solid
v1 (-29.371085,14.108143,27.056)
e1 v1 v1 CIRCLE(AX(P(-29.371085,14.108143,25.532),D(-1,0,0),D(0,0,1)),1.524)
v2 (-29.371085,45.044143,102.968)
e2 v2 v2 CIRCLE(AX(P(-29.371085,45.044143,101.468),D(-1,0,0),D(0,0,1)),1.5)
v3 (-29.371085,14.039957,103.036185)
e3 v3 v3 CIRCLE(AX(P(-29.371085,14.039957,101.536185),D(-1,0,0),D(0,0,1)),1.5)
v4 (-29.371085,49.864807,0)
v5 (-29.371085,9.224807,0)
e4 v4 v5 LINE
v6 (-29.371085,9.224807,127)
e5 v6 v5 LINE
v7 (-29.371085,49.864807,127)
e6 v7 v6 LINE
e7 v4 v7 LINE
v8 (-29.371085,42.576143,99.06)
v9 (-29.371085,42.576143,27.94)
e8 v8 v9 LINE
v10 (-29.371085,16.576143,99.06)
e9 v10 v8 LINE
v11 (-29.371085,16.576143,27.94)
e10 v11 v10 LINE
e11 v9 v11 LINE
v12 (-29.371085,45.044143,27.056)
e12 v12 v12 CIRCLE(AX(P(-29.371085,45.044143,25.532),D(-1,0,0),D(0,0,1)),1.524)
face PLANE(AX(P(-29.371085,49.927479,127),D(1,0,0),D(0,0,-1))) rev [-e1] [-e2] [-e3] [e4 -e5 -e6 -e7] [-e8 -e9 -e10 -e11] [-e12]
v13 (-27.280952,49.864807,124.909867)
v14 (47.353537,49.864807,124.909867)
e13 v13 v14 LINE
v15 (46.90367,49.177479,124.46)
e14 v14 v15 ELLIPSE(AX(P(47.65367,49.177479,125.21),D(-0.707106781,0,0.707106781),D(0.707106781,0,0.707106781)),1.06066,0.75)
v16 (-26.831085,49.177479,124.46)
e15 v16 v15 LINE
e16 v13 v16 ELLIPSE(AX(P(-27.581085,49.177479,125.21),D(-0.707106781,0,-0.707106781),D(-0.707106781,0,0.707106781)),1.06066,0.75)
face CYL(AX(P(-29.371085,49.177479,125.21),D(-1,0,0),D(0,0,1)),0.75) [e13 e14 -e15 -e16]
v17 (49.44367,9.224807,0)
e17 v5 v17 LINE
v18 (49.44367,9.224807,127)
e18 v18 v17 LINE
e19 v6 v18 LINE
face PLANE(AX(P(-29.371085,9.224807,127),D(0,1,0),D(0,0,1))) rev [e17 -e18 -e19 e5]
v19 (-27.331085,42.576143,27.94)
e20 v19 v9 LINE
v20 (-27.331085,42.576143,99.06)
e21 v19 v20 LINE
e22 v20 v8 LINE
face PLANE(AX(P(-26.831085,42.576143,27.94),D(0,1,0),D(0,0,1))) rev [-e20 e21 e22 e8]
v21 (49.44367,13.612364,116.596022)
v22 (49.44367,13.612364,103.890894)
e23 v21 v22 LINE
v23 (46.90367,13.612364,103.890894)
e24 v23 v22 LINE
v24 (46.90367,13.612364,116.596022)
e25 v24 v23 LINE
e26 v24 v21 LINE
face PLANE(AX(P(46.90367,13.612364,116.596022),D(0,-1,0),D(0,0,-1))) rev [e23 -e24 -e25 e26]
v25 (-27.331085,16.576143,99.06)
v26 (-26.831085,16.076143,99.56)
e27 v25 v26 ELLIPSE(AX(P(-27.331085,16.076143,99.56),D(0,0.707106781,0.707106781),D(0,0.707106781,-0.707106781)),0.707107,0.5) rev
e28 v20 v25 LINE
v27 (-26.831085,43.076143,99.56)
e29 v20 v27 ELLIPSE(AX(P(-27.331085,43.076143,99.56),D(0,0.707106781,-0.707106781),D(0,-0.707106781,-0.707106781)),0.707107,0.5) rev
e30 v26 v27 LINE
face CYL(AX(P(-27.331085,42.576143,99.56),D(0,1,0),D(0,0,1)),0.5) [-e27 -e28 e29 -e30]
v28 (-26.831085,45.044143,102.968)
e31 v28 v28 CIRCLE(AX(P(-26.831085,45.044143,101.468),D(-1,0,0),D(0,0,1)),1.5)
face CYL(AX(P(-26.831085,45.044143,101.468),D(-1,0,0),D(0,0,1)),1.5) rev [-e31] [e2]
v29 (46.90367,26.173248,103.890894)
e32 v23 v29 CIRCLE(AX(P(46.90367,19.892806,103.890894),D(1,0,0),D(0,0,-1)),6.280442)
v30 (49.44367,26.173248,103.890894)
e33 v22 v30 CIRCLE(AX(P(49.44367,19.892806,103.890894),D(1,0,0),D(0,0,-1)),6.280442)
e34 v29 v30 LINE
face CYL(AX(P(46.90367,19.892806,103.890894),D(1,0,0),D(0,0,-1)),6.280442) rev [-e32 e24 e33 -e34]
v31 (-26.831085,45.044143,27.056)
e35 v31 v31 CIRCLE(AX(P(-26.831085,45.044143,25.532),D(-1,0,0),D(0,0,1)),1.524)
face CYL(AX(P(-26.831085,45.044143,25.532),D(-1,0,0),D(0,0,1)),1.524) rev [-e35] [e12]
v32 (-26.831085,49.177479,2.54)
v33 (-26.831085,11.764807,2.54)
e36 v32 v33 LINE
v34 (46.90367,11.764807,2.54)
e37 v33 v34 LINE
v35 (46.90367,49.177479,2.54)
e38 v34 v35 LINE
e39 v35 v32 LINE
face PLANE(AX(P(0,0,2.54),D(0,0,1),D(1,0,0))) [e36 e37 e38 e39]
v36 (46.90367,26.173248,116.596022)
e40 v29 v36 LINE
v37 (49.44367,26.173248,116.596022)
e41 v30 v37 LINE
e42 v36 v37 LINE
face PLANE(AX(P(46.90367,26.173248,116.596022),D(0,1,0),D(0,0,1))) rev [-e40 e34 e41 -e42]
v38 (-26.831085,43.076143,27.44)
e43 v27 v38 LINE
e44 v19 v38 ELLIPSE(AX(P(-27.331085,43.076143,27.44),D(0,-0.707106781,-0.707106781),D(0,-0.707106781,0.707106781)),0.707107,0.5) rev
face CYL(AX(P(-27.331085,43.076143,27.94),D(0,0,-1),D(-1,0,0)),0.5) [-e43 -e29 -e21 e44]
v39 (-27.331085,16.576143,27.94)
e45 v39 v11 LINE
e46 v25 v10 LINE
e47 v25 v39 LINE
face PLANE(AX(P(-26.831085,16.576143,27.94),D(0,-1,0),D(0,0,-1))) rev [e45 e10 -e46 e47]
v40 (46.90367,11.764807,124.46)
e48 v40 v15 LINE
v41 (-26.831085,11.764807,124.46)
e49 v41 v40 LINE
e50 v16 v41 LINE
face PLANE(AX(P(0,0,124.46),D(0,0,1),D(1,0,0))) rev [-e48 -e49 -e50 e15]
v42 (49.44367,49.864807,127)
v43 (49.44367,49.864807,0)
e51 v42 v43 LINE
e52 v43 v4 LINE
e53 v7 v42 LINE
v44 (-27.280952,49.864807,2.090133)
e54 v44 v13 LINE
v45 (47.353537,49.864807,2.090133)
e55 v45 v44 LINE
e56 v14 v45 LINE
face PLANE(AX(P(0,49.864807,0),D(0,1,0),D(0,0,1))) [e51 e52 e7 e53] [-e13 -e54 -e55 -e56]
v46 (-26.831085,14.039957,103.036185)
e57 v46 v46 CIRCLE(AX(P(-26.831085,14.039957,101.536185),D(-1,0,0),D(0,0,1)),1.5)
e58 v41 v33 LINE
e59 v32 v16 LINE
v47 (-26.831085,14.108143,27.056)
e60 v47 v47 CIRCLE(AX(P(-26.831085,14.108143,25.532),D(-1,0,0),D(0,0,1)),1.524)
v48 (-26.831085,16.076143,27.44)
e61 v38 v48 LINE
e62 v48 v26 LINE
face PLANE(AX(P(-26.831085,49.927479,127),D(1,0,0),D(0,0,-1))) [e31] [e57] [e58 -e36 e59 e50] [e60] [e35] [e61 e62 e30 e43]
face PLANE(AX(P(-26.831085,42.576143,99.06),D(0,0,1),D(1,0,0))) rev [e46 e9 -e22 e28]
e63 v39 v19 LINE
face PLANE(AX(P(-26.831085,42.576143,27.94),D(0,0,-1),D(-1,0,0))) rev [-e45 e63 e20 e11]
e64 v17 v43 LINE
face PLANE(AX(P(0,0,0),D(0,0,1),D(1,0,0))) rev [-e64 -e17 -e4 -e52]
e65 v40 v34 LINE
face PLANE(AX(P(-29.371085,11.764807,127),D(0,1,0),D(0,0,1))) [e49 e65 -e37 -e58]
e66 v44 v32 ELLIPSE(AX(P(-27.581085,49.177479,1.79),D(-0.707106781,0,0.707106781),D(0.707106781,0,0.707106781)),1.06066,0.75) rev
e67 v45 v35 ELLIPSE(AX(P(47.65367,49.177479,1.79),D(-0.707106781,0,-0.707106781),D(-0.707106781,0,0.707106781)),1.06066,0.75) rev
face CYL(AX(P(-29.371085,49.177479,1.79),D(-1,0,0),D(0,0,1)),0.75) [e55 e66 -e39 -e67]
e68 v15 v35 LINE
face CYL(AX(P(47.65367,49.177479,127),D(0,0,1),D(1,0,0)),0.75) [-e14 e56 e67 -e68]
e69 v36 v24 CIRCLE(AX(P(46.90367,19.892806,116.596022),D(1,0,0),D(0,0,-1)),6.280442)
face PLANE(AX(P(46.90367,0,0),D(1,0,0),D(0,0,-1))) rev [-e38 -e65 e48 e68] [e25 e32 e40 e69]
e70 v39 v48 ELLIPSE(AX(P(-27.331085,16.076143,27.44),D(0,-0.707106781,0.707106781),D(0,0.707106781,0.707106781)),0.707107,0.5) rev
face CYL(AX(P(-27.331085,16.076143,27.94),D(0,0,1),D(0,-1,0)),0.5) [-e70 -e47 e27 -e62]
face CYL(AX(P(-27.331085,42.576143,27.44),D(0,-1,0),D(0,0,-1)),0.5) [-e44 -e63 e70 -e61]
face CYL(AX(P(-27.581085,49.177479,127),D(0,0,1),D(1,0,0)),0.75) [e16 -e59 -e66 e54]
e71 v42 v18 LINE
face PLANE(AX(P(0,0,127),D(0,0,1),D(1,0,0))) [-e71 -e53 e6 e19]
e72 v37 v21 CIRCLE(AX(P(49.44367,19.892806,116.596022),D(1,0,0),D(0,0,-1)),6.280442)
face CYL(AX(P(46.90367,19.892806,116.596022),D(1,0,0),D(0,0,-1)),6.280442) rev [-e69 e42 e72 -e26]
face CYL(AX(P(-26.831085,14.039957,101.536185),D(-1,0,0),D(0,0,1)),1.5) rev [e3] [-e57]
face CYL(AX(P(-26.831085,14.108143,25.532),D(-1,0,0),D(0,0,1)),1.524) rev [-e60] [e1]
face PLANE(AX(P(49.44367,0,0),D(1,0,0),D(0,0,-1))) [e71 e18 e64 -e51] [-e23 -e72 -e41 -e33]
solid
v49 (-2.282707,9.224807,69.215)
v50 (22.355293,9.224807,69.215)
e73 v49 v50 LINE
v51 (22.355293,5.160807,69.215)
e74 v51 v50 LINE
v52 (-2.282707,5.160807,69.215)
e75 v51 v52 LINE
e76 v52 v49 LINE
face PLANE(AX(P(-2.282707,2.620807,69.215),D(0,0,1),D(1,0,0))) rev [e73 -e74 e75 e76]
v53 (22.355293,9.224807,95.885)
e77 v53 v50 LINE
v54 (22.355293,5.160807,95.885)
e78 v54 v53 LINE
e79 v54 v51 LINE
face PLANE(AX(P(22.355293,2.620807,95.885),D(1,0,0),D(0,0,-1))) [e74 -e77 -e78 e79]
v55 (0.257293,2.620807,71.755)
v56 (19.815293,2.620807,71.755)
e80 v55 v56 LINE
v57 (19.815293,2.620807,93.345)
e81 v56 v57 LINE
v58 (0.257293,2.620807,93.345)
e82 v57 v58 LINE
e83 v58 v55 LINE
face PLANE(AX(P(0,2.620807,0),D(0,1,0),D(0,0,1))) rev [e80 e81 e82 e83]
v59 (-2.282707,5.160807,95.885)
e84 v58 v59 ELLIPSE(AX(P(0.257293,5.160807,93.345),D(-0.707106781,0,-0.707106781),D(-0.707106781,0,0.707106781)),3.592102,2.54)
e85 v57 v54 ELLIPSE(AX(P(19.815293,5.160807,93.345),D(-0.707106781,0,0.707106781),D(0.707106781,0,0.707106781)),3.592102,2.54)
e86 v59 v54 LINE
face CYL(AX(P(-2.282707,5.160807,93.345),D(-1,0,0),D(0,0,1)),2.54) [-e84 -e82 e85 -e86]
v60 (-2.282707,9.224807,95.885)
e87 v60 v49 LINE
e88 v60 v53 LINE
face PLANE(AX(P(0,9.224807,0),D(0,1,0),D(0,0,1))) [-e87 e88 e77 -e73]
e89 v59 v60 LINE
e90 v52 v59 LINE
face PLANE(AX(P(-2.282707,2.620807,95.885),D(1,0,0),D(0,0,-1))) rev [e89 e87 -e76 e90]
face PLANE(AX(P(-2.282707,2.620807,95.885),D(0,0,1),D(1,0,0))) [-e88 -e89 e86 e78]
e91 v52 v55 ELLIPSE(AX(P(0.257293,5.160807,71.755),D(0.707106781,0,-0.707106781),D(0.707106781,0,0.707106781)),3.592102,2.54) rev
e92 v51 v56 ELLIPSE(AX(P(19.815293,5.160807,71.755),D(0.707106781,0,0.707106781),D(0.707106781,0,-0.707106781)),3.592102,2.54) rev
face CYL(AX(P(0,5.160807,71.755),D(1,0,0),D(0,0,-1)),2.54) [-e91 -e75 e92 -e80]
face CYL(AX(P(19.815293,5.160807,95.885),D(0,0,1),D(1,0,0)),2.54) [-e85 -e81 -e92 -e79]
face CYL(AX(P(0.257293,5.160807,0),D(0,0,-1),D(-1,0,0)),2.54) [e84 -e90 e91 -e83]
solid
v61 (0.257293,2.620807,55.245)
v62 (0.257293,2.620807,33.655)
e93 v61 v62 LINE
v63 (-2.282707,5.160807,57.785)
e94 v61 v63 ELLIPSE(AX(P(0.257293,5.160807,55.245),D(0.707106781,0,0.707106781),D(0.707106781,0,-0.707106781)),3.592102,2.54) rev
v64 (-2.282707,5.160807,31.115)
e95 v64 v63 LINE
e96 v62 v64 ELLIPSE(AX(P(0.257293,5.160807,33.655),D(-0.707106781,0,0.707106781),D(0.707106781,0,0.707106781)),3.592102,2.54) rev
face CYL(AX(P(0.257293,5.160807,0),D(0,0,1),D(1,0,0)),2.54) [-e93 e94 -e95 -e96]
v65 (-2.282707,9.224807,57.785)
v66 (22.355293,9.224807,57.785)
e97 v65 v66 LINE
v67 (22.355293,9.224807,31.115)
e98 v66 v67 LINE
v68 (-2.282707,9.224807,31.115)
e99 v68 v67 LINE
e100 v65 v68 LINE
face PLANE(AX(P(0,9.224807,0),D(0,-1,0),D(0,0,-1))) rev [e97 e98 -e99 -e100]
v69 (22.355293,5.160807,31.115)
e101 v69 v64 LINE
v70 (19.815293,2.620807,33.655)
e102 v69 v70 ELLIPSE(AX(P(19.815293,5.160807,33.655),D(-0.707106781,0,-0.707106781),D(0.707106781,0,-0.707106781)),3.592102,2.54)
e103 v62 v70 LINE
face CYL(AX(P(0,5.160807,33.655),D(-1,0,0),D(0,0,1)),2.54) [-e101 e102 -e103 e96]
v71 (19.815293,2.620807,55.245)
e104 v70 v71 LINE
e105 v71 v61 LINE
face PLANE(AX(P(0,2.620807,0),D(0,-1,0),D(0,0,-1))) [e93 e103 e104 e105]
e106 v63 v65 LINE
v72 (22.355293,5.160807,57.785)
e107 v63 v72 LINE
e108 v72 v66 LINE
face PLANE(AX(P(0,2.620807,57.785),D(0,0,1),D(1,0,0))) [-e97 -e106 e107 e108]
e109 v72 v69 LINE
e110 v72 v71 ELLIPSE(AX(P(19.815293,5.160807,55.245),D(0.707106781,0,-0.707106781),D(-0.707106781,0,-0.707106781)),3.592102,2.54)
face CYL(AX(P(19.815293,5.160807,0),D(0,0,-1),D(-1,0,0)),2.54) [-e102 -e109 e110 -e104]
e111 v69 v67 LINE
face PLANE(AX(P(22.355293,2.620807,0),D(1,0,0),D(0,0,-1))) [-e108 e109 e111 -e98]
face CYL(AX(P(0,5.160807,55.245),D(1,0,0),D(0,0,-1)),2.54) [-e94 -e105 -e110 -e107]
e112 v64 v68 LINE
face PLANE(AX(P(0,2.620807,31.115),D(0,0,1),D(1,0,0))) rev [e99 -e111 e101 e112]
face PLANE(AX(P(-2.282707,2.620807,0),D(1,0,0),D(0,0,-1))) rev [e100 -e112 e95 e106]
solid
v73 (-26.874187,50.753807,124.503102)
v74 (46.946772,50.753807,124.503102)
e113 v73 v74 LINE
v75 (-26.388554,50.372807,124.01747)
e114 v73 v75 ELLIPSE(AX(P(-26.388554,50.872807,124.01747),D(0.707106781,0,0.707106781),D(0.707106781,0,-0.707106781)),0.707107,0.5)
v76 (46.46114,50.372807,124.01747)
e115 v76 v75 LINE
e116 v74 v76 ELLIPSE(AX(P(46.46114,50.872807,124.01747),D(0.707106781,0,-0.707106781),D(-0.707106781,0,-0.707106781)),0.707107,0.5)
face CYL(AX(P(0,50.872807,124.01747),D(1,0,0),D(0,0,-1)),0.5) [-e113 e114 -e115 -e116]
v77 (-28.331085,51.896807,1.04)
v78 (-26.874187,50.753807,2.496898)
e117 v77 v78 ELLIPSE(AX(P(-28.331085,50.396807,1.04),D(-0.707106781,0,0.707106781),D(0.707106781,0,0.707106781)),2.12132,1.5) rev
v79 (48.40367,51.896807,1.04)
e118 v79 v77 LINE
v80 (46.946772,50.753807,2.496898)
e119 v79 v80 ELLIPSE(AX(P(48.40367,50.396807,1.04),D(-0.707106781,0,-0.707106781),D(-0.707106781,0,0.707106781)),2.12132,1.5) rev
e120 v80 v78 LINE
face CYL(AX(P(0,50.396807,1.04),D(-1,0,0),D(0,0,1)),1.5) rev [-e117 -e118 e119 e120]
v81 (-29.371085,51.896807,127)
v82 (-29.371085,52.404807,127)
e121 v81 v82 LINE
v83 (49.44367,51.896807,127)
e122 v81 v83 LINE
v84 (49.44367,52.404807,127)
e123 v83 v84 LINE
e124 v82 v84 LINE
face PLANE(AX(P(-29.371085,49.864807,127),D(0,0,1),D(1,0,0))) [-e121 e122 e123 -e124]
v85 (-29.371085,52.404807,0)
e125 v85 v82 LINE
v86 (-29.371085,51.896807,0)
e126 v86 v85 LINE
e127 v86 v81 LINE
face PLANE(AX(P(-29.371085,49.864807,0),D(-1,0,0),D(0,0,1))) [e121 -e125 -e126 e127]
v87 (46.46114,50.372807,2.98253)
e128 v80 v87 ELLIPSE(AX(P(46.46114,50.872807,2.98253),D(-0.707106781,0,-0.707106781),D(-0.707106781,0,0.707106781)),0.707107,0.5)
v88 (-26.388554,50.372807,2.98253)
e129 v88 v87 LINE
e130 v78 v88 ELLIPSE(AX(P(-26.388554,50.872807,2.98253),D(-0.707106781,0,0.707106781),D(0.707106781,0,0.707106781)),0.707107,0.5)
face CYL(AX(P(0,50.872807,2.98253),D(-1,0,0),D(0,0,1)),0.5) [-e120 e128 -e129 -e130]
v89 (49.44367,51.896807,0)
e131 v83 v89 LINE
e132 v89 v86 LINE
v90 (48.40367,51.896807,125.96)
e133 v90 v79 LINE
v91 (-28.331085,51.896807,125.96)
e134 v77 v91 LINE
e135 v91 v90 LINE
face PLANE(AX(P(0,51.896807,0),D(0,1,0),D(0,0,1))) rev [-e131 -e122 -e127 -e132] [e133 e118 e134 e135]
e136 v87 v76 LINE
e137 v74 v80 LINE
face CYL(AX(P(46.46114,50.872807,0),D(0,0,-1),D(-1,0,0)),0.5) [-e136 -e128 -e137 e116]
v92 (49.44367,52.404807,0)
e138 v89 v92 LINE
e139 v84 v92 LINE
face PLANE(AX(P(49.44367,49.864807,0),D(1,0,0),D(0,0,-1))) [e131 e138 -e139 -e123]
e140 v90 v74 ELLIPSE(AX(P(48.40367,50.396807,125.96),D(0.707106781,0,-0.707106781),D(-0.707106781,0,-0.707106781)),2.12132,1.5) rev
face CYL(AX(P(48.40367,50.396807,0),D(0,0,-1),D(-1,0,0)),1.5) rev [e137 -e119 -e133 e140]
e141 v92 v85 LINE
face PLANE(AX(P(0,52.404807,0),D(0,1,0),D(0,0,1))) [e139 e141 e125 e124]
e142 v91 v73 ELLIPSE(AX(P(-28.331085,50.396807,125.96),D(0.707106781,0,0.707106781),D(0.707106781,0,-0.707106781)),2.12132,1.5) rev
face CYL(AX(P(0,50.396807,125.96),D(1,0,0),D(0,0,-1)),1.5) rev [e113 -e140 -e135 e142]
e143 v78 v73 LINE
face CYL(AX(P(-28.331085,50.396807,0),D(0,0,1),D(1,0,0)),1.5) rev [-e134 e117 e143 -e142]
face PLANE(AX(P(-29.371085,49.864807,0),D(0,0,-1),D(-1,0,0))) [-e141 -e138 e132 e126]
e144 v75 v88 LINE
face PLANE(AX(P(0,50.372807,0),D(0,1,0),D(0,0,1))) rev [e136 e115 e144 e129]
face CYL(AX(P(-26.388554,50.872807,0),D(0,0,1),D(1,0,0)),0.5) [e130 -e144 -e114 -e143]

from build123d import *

# Parameters (mm, degrees)
SKETCH3_W             = 76.274754771
SKETCH3_H             = 40.702671828
BOSS_EXTRUDE2_DEPTH   = 127
SHELL1_T              = -2.54
SKETCH5_W             = 127
SKETCH5_H             = 40.702671828
BOSS_EXTRUDE6_DEPTH   = 2.54
SKETCH12_W            = 24.638
SKETCH12_H            = 26.67
BOSS_EXTRUDE8_DEPTH   = 6.604
BOSS_EXTRUDE8_2_DEPTH = 6.604
SKETCH15_R            = 1.5
SKETCH15_R_2          = 1.524
CUT_EXTRUDE7_DEPTH    = 2.54
FILLET4_R             = 2.54
FILLET5_R             = 2.54
FILLET7_R             = 0.75
CUT_EXTRUDE8_DEPTH    = 2.54
SKETCH26_W            = 78.814754771
SKETCH26_H            = 127
BOSS_EXTRUDE9_DEPTH   = 2.54
CUT_EXTRUDE12_START   = -2.54
SKETCH26_7_W          = 78.814754771
SKETCH26_7_H          = 127
CUT_EXTRUDE12_DEPTH   = 2.032
SKETCH31_W            = 73.734754771
SKETCH31_H            = 121.92
BOSS_EXTRUDE10_DEPTH  = 2.032
FILLET12_R            = 1.5
FILLET13_START        = -26.874187053
FILLET13_DEPTH        = 73.820959308
FILLET13_START_2      = 1.0399999
FILLET13_2_DEPTH      = 124.9200002
SKETCH11_W            = 71.12
SKETCH11_H            = 26
CUT_EXTRUDE13_DEPTH   = 2.54
FILLET14_R            = 0.5


with BuildPart() as part:
    # Sketch3 → Boss-Extrude2 (new body)
    with BuildSketch(Plane.XY):
        with Locations((8.766292601, 29.576142827)):
            Rectangle(SKETCH3_W, SKETCH3_H)
    extrude(amount=BOSS_EXTRUDE2_DEPTH)

    # Shell1
    shell1_openings = [part.faces().sort_by_distance(p)[0] for p in [
        (8.766292601, 49.927478741, 63.5),
        (46.903669986, 29.576142827, 63.5),
    ]]
    offset(amount=SHELL1_T, openings=shell1_openings, kind=Kind.INTERSECTION)

    # Sketch5 → Boss-Extrude6 (add)
    with BuildSketch(Plane(origin=(46.903669986, 0, 0), x_dir=(0, 0, -1), z_dir=(1, 0, 0))):
        with Locations((-63.5, 29.576142827)):
            Rectangle(SKETCH5_W, SKETCH5_H)
    extrude(amount=BOSS_EXTRUDE6_DEPTH)

    # Sketch15 → Cut-Extrude7 (cut)
    with BuildSketch(Plane.ZY.offset(29.371084785)):
        with Locations((101.468, 45.044142827)):
            Circle(SKETCH15_R)
        with Locations((101.536185385, 14.039957442)):
            Circle(SKETCH15_R)
        with Locations((25.532, 45.044142827)):
            Circle(SKETCH15_R_2)
        with Locations((25.532, 14.108142827)):
            Circle(SKETCH15_R_2)
    extrude(amount=-CUT_EXTRUDE7_DEPTH, mode=Mode.SUBTRACT)

    # Fillet7
    fillet7_edges = [part.edges().sort_by_distance(p)[0] for p in [
        (-26.831084785, 49.927478741, 63.5),
        (10.036292601, 49.927478741, 2.54),
        (10.036292601, 49.927478741, 124.46),
        (46.903669986, 49.927478741, 63.5),
    ]]
    fillet(fillet7_edges, radius=FILLET7_R)

    # Sketch6 → Cut-Extrude8 (cut)
    with BuildSketch(Plane(origin=(49.443669986, 0.547229788, -2.723397162), x_dir=(0, 0, -1), z_dir=(1, 0, 0))):
        with BuildLine():
            Line((-119.319419188, 25.626017745), (-106.614290816, 25.626017745))
            ThreePointArc((-106.614290816, 25.626017745), (-100.333849188, 19.345576117), (-106.614290816, 13.065134489))
            Line((-106.614290816, 13.065134489), (-119.319419188, 13.065134489))
            ThreePointArc((-119.319419188, 13.065134489), (-125.599860816, 19.345576117), (-119.319419188, 25.626017745))
        make_face()
    extrude(amount=-CUT_EXTRUDE8_DEPTH, mode=Mode.SUBTRACT)


with BuildPart() as body_2:
    # Sketch12 → Boss-Extrude8 (new body)
    with BuildSketch(Plane(origin=(0, 9.224806913, 0), x_dir=(-1, 0, 0), z_dir=(0, -1, 0))):
        with Locations((-10.036292601, -44.45)):
            Rectangle(SKETCH12_W, SKETCH12_H)
    extrude(amount=BOSS_EXTRUDE8_DEPTH)

    # Fillet4
    fillet4_edges = [body_2.edges().sort_by_distance(p)[0] for p in [
        (10.036292601, 2.620806913, 57.785),
        (-2.282707399, 2.620806913, 44.45),
        (10.036292601, 2.620806913, 31.115),
        (22.355292601, 2.620806913, 44.45),
    ]]
    fillet(fillet4_edges, radius=FILLET4_R)


with BuildPart() as body_3:
    # Sketch12 → Boss-Extrude8 2 (new body)
    with BuildSketch(Plane(origin=(0, 9.224806913, 0), x_dir=(-1, 0, 0), z_dir=(0, -1, 0))):
        with Locations((-10.036292601, -82.55)):
            Rectangle(SKETCH12_W, SKETCH12_H)
    extrude(amount=BOSS_EXTRUDE8_2_DEPTH)

    # Fillet5
    fillet5_edges = [body_3.edges().sort_by_distance(p)[0] for p in [
        (10.036292601, 2.620806913, 69.215),
        (22.355292601, 2.620806913, 82.55),
        (10.036292601, 2.620806913, 95.885),
        (-2.282707399, 2.620806913, 82.55),
    ]]
    fillet(fillet5_edges, radius=FILLET5_R)


with BuildPart() as body_4:
    # Sketch26 → Boss-Extrude9 (new body)
    with BuildSketch(Plane(origin=(0, 52.404806913, 0), x_dir=(1, 0, 0), z_dir=(0, 1, 0))):
        with Locations((10.036292601, -63.5)):
            Rectangle(SKETCH26_W, SKETCH26_H)
    extrude(amount=-BOSS_EXTRUDE9_DEPTH)


with BuildPart() as cut_extrude12_tool:
    # Sketch26<7> → Cut-Extrude12 (new body)
    with BuildSketch(Plane(origin=(0, 52.404806913, 0), x_dir=(1, 0, 0), z_dir=(0, 1, 0)).offset(CUT_EXTRUDE12_START)):
        with Locations((10.036292601, -63.5)):
            Rectangle(SKETCH26_7_W, SKETCH26_7_H)
    extrude(amount=CUT_EXTRUDE12_DEPTH)


with BuildPart() as part_1:
    add(part.part)

    # Cut-Extrude12: cut by cut_extrude12_tool
    add(cut_extrude12_tool.part, mode=Mode.SUBTRACT)

    # Sketch11 → Cut-Extrude13 (cut)
    with BuildSketch(Plane.ZY.offset(29.371084785)):
        with Locations((63.5, 29.576142827)):
            Rectangle(SKETCH11_W, SKETCH11_H)
    extrude(amount=-CUT_EXTRUDE13_DEPTH, mode=Mode.SUBTRACT)

    # Fillet14
    fillet14_edges = [part_1.edges().sort_by_distance(p)[0] for p in [
        (-26.831084785, 29.576142827, 27.94),
        (-26.831084785, 42.576142827, 63.5),
        (-26.831084785, 29.576142827, 99.06),
        (-26.831084785, 16.576142827, 63.5),
    ]]
    fillet(fillet14_edges, radius=FILLET14_R)


with BuildPart() as body_4_1:
    add(body_4.part)

    # Cut-Extrude12: cut by cut_extrude12_tool
    add(cut_extrude12_tool.part, mode=Mode.SUBTRACT)

    # Sketch31 → Boss-Extrude10 (add)
    with BuildSketch(Plane(origin=(0, 52.404806913, 0), x_dir=(1, 0, 0), z_dir=(0, 1, 0))):
        with Locations((10.036292601, -63.5)):
            Rectangle(SKETCH31_W, SKETCH31_H)
    extrude(amount=-BOSS_EXTRUDE10_DEPTH)

    # Fillet12
    fillet12_edges = [body_4_1.edges().sort_by_distance(p)[0] for p in [
        (10.036292601, 51.896806913, 124.46),
        (46.903669986, 51.896806913, 63.5),
        (10.036292601, 51.896806913, 2.54),
        (-26.831084785, 51.896806913, 63.5),
    ]]
    fillet(fillet12_edges, radius=FILLET12_R)

    # Fillet13: read off the stored shape, not the designer's step
    # Fillet13 outline → Fillet13 (cut)
    with BuildSketch(Plane.YZ.offset(FILLET13_START)):
        with BuildLine():
            ThreePointArc((50.753806913, 2.496897731), (50.479424147, 2.673904321), (50.372806913, 2.982530309))
            Line((50.372806913, 2.982530309), (50.372806913, 2.54))
            Line((50.372806913, 2.54), (50.396806913, 2.54))
            ThreePointArc((50.396806913, 2.54), (50.57660319, 2.529185448), (50.753806913, 2.496897731))
        make_face()
        with BuildLine():
            ThreePointArc((50.372806913, 124.017469691), (50.479424147, 124.326095679), (50.753806913, 124.503102269))
            ThreePointArc((50.753806913, 124.503102269), (50.57660319, 124.470814552), (50.396806913, 124.46))
            Line((50.396806913, 124.46), (50.372806913, 124.46))
            Line((50.372806913, 124.46), (50.372806913, 124.017469691))
        make_face()
    extrude(amount=FILLET13_DEPTH, mode=Mode.SUBTRACT)

    # Fillet13 2 outline → Fillet13 2 (cut)
    with BuildSketch(Plane.XY.offset(FILLET13_START_2)):
        with BuildLine():
            ThreePointArc((46.946772255, 50.753806913), (46.769765665, 50.479424147), (46.461139678, 50.372806913))
            Line((46.461139678, 50.372806913), (46.903669986, 50.372806913))
            Line((46.903669986, 50.372806913), (46.903669986, 50.396806913))
            ThreePointArc((46.903669986, 50.396806913), (46.914484538, 50.57660319), (46.946772255, 50.753806913))
        make_face()
        with BuildLine():
            ThreePointArc((-26.388554476, 50.372806913), (-26.697180463, 50.479424147), (-26.874187053, 50.753806913))
            ThreePointArc((-26.874187053, 50.753806913), (-26.841899337, 50.57660319), (-26.831084785, 50.396806913))
            Line((-26.831084785, 50.396806913), (-26.831084785, 50.372806913))
            Line((-26.831084785, 50.372806913), (-26.388554476, 50.372806913))
        make_face()
    extrude(amount=FILLET13_2_DEPTH, mode=Mode.SUBTRACT)


solid = Compound([body_2.part, body_3.part, part_1.part, body_4_1.part])
